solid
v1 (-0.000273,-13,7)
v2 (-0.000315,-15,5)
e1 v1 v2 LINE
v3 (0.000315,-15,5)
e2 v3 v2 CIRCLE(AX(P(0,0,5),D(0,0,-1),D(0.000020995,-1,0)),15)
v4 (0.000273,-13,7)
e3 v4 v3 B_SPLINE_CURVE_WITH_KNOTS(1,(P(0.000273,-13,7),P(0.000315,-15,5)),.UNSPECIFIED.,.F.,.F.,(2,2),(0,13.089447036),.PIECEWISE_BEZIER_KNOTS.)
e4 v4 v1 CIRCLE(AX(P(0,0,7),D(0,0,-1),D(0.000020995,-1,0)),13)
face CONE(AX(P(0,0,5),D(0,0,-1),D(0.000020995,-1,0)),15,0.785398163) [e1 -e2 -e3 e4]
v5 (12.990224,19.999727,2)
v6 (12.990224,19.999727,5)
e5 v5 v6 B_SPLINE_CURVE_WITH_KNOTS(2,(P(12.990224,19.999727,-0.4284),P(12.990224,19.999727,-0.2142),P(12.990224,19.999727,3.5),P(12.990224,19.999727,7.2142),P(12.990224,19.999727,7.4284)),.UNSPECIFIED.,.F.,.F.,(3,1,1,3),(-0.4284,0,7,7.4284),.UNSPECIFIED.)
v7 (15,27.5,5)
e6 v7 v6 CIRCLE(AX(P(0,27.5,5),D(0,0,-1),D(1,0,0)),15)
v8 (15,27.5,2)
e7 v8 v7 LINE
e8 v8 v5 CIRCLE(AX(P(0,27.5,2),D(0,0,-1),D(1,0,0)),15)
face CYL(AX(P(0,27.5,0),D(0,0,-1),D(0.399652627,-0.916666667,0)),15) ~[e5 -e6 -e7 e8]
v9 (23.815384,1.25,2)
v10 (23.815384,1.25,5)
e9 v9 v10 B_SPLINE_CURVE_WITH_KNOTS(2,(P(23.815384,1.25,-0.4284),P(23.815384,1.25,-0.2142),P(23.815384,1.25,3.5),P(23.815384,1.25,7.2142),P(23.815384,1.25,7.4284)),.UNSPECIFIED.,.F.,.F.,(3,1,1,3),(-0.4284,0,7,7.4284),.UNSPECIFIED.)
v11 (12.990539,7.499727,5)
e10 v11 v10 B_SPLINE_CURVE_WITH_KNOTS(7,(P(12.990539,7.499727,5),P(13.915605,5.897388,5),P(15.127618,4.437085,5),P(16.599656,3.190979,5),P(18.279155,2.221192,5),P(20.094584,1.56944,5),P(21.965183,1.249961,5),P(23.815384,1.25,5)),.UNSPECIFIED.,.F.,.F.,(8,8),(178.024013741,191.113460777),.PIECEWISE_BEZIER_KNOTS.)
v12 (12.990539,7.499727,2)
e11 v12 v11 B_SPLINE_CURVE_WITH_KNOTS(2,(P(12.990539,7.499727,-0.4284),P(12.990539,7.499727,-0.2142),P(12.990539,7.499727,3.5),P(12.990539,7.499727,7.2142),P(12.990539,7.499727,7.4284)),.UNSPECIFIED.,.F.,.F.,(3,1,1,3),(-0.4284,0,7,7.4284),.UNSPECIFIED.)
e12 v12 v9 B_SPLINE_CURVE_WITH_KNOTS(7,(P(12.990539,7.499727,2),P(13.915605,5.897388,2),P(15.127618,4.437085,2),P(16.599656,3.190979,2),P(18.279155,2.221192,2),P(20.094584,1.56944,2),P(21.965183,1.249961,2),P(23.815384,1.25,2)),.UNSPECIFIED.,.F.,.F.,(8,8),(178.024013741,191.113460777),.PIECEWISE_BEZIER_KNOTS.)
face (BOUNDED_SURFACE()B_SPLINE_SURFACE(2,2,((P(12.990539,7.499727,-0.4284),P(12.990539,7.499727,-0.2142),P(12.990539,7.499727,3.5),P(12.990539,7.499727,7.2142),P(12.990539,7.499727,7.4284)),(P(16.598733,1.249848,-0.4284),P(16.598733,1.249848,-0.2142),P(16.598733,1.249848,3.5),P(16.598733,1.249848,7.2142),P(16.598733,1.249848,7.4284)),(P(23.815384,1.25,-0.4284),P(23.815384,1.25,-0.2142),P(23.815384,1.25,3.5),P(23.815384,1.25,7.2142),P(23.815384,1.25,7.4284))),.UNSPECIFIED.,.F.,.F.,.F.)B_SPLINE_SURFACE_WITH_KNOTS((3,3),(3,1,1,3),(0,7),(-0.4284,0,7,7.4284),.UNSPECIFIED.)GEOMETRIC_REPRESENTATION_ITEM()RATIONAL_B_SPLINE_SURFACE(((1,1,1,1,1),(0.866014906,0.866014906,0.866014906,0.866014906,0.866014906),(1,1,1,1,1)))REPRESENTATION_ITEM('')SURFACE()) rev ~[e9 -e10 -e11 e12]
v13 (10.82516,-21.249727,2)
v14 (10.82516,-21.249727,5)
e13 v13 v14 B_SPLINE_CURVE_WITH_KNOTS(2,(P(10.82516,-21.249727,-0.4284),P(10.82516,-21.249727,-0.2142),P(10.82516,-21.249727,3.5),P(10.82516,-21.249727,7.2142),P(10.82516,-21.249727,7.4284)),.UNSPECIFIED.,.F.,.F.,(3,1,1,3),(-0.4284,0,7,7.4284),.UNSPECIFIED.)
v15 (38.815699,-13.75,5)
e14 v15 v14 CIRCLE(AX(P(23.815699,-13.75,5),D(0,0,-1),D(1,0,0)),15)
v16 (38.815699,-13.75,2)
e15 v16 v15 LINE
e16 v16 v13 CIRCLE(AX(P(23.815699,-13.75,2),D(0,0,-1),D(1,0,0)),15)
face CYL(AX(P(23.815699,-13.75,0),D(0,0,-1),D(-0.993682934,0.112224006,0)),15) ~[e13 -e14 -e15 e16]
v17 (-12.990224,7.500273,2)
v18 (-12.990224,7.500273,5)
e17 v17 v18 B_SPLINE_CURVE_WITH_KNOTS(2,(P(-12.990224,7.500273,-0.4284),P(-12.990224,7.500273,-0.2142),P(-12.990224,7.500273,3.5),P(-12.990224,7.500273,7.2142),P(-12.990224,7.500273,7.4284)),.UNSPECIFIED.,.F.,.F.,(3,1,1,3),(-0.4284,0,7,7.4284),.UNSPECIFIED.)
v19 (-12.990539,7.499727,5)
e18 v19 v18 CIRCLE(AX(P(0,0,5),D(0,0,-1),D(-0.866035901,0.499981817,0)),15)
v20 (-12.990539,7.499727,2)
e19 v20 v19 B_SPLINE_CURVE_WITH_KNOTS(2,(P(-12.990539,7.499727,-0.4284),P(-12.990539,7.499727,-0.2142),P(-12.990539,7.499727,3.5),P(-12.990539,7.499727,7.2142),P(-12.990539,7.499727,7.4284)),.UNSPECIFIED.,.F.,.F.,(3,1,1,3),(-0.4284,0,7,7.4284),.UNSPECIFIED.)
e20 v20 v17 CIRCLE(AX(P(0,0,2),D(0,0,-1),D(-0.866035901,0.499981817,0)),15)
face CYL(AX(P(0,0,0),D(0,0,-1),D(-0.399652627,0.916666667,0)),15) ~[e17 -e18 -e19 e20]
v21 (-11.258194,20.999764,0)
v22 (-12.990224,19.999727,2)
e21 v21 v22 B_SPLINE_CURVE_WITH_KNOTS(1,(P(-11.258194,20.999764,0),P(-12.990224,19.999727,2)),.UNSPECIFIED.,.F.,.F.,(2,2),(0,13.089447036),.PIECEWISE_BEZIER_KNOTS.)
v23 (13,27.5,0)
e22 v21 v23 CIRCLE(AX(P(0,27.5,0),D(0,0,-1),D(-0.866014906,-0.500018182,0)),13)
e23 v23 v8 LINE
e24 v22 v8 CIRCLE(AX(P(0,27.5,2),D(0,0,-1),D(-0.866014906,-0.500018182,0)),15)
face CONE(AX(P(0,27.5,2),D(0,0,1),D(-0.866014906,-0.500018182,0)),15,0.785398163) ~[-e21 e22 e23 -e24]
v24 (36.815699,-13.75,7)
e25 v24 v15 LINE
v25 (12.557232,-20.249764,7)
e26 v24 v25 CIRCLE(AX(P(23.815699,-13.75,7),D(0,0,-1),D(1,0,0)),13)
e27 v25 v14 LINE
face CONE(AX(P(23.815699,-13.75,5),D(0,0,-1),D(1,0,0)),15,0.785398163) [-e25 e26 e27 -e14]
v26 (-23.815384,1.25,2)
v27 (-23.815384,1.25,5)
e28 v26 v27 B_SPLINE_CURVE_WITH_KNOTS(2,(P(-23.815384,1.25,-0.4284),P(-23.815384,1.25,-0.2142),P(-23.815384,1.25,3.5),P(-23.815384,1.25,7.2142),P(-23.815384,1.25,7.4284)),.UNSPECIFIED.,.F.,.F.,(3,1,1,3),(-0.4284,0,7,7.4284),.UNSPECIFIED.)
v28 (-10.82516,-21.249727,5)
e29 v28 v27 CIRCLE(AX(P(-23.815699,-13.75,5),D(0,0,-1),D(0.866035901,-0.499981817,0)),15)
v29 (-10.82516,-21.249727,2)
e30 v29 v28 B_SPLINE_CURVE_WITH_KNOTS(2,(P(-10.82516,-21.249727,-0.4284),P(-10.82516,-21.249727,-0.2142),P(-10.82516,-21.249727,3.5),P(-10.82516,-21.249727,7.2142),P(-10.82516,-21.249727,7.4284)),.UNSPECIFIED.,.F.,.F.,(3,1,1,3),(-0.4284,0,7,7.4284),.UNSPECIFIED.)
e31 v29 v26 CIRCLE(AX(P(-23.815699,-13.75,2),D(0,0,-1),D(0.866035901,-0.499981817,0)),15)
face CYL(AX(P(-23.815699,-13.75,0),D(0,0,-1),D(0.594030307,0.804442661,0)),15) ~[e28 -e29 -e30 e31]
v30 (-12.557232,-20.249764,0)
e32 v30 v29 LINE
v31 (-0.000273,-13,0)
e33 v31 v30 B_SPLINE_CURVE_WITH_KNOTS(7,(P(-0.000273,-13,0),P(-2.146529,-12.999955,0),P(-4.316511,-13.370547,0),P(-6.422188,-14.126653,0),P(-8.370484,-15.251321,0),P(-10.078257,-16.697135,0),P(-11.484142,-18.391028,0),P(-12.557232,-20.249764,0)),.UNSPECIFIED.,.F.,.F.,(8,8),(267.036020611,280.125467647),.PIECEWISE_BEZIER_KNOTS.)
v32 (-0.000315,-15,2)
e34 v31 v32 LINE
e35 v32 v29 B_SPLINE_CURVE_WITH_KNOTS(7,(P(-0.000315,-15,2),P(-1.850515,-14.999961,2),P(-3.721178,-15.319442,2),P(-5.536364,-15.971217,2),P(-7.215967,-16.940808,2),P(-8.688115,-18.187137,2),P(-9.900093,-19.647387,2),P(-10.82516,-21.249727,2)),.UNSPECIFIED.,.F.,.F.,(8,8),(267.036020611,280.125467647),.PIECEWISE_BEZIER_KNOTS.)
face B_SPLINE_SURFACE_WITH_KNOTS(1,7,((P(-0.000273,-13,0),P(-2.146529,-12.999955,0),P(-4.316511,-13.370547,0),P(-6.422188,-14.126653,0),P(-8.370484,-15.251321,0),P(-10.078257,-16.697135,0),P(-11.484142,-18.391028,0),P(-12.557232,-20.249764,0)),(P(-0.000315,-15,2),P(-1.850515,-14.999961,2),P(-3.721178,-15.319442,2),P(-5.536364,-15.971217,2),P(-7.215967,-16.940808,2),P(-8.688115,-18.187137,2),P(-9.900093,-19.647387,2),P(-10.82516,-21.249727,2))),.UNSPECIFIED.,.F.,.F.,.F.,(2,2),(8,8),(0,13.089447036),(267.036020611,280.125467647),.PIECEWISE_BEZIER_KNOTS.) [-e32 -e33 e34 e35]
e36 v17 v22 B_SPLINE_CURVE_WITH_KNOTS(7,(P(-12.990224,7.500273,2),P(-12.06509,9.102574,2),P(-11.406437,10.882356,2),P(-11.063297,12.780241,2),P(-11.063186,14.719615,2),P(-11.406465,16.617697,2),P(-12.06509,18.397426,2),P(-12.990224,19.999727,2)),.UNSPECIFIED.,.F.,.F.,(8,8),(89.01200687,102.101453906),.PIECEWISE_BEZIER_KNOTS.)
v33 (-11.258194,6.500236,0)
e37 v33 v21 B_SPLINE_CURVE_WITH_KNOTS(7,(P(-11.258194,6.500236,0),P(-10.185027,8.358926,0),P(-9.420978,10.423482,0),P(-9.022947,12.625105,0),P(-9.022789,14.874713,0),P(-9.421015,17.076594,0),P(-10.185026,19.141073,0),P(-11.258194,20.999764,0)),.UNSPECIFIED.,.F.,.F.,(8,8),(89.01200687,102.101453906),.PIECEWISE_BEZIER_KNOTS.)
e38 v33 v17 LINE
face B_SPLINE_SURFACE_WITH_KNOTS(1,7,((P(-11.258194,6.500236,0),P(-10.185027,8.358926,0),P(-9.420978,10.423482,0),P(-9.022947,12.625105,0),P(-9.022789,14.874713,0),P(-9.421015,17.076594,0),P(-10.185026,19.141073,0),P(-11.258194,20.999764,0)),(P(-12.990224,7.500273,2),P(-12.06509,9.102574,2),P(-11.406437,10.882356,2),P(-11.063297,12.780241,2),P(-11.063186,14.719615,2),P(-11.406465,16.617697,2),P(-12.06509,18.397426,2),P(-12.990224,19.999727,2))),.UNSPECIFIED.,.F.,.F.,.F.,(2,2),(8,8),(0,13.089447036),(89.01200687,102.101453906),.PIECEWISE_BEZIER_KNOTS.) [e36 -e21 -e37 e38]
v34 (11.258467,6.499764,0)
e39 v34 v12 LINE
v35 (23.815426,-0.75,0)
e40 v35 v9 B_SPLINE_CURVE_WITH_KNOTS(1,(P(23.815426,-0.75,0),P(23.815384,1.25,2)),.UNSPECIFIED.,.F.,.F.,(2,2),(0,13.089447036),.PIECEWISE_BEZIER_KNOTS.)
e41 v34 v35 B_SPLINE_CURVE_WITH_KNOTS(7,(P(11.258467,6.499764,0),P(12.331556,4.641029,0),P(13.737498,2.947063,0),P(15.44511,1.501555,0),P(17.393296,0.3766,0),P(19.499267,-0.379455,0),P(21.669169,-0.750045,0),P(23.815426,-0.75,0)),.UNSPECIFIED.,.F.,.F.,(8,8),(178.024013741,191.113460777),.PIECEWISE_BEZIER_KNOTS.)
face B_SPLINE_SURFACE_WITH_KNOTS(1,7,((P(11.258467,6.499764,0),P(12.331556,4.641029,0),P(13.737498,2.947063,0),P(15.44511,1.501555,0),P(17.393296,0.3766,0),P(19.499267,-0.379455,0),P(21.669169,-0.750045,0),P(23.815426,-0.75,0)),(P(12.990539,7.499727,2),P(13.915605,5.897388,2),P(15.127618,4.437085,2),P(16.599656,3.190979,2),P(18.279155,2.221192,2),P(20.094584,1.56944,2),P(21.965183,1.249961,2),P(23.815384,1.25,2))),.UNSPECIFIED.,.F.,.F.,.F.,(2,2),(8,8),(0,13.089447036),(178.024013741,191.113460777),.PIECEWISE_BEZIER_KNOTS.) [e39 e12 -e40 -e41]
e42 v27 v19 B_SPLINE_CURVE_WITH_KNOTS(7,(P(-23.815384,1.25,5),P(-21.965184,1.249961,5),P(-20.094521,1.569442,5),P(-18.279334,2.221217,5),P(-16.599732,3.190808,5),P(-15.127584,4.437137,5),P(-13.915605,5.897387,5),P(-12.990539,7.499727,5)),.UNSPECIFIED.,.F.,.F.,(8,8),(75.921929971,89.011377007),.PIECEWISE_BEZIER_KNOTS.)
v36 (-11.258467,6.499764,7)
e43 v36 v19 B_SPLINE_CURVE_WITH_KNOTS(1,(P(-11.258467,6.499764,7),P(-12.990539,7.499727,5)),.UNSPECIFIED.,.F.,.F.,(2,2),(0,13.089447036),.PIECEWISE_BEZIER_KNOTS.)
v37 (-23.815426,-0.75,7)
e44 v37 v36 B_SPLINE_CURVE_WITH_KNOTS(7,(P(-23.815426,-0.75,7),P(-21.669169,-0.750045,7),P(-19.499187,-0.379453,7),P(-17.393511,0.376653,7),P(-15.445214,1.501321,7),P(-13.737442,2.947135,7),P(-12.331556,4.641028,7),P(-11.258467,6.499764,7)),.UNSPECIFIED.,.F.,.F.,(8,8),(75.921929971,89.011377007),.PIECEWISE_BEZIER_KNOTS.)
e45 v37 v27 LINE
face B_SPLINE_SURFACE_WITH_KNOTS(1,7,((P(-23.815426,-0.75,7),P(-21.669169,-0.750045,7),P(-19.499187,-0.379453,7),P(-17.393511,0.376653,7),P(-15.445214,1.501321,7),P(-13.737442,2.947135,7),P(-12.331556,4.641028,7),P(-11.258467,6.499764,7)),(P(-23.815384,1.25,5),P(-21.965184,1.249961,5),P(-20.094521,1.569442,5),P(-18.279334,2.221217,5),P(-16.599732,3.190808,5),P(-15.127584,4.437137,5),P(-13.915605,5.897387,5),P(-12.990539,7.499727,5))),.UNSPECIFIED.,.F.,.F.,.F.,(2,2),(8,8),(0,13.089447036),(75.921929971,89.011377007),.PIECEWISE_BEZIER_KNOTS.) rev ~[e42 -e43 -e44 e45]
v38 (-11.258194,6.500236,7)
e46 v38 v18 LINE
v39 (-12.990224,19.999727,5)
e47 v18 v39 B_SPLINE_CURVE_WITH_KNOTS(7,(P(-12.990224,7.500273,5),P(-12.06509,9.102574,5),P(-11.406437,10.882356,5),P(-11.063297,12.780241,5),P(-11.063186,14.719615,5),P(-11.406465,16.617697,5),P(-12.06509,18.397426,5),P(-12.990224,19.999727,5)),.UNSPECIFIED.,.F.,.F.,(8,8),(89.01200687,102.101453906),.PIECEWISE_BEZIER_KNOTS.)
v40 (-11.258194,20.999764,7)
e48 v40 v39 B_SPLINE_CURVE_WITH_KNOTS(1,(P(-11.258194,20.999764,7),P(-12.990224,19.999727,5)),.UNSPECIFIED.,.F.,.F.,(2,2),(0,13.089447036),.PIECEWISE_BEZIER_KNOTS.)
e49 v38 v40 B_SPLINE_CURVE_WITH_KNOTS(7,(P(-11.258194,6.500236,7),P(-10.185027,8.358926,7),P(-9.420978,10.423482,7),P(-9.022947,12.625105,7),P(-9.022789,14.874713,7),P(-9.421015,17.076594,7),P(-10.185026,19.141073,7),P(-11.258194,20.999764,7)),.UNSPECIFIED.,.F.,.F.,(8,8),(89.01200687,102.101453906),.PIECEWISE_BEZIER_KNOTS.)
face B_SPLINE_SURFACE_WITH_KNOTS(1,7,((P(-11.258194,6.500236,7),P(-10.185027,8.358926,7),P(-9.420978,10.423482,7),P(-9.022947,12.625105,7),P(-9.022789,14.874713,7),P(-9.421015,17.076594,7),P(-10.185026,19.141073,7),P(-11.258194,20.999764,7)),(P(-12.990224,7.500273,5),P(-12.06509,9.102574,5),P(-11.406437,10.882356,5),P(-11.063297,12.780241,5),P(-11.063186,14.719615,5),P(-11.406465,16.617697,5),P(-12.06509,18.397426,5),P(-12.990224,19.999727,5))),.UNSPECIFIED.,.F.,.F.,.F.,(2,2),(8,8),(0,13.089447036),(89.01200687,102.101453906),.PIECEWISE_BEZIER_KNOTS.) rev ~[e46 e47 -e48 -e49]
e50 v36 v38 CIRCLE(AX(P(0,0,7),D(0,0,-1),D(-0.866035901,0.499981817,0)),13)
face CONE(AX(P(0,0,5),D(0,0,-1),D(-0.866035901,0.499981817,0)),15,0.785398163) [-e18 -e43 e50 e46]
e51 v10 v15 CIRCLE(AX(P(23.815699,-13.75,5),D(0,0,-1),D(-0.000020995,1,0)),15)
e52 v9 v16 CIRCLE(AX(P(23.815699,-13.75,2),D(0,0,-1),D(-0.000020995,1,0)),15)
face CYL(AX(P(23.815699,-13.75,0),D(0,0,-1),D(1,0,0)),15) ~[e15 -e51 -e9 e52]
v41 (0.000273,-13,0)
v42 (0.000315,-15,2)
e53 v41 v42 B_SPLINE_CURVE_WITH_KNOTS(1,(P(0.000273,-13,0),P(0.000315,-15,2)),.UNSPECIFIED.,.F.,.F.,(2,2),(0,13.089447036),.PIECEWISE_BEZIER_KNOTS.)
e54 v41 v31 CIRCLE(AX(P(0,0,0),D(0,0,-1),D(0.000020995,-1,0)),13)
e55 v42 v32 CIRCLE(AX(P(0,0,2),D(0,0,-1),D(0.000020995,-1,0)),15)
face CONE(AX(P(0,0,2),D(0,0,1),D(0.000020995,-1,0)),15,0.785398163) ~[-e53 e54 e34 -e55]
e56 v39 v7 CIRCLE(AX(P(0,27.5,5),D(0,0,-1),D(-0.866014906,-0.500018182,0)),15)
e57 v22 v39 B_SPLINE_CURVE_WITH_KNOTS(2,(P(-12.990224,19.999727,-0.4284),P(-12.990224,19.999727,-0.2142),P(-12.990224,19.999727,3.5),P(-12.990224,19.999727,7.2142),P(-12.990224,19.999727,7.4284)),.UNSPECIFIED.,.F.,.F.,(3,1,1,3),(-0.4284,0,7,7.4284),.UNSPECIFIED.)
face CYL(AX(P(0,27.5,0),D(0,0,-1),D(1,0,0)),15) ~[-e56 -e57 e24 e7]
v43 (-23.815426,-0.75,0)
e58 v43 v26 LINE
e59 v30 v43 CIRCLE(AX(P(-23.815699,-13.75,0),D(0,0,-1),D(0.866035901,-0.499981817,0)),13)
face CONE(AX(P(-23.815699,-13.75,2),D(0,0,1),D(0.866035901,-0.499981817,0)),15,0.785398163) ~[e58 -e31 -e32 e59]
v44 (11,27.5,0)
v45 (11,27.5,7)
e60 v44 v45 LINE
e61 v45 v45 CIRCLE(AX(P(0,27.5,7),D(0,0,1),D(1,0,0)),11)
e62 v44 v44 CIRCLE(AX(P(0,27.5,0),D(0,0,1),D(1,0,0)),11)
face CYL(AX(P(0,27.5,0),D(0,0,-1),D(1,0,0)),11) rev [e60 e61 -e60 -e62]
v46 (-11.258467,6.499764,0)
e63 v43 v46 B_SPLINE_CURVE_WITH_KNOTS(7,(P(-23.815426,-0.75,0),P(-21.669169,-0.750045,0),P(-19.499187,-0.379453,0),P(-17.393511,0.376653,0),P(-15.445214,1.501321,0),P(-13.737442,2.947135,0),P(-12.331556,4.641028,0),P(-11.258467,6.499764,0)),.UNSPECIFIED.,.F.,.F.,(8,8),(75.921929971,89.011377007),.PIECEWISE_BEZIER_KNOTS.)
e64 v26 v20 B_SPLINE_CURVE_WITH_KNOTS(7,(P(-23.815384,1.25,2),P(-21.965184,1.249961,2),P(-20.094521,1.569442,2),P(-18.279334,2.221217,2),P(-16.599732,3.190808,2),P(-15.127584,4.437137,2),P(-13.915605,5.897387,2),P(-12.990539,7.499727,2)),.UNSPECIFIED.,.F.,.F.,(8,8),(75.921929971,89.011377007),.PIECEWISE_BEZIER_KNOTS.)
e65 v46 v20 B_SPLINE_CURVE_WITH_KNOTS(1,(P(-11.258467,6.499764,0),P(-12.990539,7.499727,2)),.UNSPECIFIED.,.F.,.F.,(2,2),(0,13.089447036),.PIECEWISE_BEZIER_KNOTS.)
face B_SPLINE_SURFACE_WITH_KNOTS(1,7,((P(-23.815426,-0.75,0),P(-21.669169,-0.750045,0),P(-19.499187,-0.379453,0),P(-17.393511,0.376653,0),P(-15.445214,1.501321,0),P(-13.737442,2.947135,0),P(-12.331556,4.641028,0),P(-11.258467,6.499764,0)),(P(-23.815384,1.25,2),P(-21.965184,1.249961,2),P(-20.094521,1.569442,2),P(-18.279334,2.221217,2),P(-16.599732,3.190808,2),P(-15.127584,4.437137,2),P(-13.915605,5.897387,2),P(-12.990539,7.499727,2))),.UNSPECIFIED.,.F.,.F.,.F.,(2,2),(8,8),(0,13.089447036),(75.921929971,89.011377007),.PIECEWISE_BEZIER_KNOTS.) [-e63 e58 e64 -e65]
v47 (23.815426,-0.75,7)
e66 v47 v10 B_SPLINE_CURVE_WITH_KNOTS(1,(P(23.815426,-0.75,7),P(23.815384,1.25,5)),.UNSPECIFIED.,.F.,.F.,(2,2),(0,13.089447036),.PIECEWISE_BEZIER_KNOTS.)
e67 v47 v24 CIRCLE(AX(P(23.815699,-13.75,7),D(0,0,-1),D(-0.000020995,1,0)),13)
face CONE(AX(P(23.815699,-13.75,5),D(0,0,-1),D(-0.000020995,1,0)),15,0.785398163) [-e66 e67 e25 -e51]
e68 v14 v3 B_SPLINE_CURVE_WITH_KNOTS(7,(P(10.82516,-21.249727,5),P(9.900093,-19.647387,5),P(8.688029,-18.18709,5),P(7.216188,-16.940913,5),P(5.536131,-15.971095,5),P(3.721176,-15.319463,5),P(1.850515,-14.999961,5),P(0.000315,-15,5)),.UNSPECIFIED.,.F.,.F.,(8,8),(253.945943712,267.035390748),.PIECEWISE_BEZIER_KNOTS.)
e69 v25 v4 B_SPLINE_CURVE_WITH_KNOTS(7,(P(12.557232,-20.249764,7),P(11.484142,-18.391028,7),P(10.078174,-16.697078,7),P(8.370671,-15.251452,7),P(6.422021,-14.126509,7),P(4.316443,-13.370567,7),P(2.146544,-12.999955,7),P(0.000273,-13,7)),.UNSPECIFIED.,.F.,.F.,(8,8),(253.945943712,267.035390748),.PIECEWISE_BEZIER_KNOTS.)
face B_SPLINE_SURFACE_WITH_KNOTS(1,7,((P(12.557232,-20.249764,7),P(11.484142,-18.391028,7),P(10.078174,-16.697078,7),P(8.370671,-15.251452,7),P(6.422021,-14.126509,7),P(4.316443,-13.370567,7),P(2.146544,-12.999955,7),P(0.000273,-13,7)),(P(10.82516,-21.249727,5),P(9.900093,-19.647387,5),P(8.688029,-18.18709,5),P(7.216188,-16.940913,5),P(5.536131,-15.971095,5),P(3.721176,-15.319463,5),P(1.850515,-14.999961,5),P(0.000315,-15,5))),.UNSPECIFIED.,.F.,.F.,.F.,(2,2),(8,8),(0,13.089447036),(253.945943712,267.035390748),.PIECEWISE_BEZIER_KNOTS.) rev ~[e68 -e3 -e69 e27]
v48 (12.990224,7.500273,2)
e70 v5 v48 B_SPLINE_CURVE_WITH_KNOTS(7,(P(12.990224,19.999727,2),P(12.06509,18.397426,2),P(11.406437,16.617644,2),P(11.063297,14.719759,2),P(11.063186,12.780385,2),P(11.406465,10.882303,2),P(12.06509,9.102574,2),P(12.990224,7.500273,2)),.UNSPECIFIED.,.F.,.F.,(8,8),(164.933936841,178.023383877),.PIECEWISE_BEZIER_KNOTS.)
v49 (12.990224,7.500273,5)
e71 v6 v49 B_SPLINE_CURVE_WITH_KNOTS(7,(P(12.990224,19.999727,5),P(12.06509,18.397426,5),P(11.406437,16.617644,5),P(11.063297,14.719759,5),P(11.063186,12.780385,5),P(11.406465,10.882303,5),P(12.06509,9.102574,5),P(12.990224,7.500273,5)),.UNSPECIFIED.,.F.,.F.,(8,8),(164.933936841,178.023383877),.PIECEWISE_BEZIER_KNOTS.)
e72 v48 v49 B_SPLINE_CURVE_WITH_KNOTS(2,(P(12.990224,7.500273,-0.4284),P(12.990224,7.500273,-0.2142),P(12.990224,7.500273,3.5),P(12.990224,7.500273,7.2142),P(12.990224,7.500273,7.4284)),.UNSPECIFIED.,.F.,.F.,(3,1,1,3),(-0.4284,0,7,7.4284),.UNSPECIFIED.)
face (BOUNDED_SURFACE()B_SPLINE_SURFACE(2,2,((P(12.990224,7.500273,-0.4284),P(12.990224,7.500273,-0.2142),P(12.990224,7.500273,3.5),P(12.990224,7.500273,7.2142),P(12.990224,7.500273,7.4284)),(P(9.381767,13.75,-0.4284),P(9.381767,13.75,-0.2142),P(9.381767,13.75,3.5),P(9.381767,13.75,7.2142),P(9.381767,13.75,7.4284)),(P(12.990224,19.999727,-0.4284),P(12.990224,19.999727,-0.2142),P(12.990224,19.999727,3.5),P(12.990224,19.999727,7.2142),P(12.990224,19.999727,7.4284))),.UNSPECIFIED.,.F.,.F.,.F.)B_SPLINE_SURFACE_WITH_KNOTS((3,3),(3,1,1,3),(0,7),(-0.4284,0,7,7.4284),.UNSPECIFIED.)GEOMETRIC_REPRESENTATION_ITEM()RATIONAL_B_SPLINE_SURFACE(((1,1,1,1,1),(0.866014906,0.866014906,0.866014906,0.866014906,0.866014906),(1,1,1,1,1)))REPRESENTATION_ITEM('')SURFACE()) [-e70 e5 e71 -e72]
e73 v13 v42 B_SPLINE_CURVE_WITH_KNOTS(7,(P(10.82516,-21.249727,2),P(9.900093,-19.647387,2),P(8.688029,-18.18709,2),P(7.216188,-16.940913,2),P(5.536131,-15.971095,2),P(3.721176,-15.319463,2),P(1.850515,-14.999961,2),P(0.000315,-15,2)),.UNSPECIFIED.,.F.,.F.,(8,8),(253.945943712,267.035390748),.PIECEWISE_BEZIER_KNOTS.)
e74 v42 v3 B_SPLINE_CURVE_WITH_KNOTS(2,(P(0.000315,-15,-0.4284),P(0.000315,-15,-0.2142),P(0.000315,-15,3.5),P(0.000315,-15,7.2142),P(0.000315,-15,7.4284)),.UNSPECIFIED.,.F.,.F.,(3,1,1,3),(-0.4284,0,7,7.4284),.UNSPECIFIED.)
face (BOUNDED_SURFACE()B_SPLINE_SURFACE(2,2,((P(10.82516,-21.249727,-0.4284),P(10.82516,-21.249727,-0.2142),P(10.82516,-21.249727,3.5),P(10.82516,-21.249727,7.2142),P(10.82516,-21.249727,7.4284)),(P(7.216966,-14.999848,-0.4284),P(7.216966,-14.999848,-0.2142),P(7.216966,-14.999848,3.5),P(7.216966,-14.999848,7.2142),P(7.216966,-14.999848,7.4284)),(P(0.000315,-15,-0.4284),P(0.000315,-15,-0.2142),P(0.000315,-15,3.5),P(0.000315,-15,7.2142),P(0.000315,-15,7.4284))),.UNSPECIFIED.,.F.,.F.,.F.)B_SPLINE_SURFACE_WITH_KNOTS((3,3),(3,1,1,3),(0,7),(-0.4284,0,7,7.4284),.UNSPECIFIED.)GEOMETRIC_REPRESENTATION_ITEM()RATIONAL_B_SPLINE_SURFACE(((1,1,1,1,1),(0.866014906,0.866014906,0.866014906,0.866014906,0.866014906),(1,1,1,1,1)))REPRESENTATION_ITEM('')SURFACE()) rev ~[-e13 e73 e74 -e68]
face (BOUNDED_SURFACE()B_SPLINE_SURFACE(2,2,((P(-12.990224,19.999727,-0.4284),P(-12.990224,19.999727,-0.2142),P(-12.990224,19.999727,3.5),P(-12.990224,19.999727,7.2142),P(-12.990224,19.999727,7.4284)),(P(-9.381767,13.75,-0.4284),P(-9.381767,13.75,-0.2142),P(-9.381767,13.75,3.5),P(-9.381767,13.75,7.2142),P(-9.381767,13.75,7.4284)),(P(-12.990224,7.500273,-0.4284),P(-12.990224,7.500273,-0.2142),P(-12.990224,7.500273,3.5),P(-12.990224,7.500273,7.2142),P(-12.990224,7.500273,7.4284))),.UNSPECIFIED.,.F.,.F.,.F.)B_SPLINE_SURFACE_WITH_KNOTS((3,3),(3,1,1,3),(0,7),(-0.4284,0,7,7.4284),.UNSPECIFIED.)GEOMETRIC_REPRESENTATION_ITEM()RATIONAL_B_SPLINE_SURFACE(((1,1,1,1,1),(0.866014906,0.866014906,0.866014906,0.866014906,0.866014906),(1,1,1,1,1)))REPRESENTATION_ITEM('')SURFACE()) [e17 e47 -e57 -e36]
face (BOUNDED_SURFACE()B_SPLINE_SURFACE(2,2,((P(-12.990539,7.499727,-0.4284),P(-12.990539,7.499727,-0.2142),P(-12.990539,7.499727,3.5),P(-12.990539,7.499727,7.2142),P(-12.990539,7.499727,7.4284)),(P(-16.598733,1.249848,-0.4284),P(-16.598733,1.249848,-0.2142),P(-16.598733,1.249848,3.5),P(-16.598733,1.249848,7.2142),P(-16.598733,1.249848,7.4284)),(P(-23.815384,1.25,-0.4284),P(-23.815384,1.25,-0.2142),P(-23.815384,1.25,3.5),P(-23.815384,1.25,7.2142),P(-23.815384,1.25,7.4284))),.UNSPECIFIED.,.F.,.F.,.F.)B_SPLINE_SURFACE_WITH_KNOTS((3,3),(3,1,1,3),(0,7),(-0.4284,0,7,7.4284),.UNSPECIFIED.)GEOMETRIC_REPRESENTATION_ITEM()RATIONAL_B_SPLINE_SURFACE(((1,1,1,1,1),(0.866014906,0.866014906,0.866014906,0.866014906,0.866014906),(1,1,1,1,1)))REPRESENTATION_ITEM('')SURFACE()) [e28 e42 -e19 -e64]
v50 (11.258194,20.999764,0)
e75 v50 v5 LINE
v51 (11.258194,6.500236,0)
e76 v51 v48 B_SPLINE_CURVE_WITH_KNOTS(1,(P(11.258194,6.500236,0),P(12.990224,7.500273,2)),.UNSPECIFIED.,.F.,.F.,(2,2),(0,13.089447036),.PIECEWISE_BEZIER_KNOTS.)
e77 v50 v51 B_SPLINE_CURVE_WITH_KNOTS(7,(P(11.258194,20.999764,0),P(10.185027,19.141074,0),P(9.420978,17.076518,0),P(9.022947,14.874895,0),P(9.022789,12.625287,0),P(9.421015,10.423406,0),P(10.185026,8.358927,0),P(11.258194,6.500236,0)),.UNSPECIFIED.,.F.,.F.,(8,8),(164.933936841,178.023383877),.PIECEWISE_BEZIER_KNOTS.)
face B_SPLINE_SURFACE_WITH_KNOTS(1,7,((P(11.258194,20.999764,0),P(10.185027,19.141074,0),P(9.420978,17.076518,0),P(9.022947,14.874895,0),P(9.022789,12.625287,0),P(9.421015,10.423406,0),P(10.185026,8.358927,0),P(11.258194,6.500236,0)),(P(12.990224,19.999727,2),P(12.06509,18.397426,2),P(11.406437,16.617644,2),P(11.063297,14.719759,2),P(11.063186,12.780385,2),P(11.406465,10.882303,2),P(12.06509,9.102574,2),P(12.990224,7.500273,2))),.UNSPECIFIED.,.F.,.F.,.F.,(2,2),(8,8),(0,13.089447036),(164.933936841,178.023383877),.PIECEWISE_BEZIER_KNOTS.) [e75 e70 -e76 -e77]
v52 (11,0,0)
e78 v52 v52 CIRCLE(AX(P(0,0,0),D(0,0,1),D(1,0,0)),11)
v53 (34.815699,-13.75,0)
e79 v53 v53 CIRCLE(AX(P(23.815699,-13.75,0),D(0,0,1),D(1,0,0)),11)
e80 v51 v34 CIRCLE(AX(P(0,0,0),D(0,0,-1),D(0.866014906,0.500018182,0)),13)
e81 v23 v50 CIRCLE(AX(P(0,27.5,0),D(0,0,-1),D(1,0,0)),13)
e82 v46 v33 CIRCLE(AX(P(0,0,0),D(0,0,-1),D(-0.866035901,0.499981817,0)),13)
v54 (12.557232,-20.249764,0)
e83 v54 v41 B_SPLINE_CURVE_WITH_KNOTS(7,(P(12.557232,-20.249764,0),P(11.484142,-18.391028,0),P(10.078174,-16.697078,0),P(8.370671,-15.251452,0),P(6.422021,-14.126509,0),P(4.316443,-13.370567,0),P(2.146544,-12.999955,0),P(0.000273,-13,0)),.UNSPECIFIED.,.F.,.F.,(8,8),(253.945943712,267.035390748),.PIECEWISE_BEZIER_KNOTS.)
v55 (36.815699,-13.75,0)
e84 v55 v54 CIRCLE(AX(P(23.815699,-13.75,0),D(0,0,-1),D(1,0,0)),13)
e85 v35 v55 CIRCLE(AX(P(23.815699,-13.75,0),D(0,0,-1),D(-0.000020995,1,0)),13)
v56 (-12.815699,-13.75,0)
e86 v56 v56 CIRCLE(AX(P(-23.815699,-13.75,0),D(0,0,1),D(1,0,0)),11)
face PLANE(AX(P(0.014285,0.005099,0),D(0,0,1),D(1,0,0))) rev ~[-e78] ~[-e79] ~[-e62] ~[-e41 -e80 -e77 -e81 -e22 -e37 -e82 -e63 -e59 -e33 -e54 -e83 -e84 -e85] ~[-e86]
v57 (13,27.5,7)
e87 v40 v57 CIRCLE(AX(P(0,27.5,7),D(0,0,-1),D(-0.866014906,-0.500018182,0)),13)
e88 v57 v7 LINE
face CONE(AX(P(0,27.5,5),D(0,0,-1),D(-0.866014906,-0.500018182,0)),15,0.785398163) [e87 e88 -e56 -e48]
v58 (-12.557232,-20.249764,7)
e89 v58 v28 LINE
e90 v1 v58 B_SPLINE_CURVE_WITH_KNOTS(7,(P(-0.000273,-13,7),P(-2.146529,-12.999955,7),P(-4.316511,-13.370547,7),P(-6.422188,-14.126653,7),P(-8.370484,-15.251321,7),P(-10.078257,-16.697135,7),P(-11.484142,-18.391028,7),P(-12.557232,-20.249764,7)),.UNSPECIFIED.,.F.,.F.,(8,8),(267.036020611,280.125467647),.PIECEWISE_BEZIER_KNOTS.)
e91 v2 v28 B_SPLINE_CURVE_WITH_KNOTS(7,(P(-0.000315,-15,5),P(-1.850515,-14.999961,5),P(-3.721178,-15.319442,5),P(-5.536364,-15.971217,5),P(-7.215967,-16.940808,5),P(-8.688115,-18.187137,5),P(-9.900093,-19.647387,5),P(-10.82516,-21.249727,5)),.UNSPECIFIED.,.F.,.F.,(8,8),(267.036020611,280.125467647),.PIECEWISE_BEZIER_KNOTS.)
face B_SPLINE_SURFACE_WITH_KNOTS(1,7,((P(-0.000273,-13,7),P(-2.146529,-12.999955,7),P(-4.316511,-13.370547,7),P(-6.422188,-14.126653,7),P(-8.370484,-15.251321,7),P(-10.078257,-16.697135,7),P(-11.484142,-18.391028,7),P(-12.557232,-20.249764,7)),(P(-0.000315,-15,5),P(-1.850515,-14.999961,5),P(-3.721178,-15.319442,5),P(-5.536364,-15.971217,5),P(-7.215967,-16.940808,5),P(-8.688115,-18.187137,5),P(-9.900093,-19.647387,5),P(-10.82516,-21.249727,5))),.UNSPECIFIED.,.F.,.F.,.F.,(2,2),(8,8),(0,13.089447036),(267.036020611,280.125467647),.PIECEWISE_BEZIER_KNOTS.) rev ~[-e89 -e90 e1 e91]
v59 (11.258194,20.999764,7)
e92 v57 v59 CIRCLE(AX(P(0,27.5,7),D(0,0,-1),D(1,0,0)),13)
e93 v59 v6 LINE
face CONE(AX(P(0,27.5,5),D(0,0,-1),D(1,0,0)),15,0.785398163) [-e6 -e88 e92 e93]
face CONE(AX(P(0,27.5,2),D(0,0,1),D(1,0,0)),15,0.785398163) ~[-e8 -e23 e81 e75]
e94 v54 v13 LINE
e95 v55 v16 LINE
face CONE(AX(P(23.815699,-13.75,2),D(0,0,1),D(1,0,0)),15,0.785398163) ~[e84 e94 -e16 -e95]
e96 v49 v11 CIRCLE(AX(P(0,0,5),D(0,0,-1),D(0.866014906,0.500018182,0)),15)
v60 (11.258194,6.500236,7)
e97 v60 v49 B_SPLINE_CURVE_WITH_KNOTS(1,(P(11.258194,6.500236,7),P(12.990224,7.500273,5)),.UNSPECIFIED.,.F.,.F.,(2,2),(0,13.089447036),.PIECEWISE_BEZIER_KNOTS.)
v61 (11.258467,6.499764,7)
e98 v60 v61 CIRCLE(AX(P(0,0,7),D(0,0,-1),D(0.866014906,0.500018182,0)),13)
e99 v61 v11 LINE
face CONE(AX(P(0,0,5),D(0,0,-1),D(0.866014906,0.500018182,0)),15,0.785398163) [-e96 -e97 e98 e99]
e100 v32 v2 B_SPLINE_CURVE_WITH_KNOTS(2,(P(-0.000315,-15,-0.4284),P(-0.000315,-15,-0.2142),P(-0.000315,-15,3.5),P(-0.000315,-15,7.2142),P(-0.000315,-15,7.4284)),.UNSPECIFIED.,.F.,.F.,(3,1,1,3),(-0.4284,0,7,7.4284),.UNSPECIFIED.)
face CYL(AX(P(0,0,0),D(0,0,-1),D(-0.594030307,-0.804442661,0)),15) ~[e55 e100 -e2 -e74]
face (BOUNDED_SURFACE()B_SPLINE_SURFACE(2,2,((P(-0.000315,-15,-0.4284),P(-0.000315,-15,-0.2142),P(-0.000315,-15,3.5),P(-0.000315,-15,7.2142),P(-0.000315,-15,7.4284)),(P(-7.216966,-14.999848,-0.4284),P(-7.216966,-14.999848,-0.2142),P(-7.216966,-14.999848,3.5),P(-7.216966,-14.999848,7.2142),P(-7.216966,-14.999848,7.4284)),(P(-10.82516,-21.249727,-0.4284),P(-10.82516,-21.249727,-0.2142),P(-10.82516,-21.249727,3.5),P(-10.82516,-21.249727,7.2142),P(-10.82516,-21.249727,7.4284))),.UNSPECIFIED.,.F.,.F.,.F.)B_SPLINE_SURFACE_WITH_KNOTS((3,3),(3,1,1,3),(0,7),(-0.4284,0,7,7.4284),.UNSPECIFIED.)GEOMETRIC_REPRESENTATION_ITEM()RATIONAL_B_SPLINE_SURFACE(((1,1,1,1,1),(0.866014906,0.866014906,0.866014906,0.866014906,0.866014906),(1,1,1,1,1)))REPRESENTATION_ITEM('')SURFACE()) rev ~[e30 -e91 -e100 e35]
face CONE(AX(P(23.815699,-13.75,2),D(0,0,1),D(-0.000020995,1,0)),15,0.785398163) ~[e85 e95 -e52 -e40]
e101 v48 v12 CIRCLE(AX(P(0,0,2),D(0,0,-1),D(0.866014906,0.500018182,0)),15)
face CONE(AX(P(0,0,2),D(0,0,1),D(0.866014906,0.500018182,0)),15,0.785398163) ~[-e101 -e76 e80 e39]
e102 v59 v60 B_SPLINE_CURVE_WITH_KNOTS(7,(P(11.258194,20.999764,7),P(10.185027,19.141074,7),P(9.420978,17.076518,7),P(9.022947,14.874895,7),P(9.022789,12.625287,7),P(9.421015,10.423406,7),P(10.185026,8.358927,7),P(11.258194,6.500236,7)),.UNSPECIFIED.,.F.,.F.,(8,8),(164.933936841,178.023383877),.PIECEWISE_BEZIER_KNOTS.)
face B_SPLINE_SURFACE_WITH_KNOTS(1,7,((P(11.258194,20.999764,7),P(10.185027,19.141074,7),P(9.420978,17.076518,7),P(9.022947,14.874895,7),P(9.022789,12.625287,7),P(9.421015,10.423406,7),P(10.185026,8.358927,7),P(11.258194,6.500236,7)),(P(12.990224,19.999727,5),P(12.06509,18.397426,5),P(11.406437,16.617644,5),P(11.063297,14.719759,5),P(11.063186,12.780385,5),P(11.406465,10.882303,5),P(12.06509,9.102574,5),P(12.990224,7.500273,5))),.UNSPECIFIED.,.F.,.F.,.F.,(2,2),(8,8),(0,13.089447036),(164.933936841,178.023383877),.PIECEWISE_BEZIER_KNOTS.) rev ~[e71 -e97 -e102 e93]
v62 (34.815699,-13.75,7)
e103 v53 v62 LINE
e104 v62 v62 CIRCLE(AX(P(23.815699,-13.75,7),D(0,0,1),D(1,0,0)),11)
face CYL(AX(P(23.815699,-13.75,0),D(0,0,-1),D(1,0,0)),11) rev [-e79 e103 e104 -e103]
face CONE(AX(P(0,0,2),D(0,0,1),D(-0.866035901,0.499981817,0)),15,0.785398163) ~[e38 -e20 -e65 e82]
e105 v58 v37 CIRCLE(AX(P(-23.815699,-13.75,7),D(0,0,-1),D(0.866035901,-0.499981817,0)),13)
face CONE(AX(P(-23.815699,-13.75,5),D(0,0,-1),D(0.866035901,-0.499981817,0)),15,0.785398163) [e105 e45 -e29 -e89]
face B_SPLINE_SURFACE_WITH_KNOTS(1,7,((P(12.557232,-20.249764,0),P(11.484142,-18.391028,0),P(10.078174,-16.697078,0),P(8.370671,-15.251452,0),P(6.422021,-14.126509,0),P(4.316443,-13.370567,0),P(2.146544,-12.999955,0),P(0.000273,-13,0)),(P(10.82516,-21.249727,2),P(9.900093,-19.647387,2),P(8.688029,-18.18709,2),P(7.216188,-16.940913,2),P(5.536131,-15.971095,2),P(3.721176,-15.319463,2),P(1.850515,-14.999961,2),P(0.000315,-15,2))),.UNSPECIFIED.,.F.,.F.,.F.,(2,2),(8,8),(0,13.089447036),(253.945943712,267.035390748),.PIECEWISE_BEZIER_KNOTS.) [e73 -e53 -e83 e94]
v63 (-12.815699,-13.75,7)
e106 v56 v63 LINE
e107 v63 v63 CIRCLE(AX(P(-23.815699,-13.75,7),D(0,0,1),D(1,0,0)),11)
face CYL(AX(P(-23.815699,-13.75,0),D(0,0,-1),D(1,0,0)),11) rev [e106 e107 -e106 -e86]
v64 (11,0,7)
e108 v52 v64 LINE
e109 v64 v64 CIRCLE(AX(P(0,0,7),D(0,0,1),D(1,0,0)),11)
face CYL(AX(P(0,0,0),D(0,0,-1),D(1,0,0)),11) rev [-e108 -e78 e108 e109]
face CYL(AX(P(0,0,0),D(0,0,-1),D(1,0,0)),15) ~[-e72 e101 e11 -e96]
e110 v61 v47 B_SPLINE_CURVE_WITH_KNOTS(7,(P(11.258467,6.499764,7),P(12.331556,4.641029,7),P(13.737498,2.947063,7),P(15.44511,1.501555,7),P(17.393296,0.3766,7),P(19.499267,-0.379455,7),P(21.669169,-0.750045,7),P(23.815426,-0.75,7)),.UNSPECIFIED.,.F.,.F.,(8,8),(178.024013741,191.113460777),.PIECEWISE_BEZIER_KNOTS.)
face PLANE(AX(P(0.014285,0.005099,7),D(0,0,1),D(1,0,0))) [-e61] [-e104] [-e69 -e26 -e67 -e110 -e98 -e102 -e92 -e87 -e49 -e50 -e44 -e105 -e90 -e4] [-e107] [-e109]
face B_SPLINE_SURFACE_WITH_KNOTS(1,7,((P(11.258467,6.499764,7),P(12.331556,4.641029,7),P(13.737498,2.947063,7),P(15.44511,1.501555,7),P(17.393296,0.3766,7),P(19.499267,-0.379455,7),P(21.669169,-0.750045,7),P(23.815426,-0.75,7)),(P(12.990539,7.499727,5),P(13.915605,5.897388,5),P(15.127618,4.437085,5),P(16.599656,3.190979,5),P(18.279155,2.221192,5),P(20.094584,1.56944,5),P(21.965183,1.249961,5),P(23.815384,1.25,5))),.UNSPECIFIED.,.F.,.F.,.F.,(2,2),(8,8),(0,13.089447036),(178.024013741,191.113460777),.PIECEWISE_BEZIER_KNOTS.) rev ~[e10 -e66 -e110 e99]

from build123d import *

# Parameters (mm, degrees)
F0_R     = 11
F1_DEPTH = 7
F2_R     = 12.499
F3_SIZE  = 2


# Not quite as in the source:
# - a fillet or chamfer is up to 0.001 mm smaller than in the source, because OpenCascade refuses the exact size


with BuildPart() as f1:
    # F0 (on Top) → F1 (new body)
    with BuildSketch(Plane.XY):
        with BuildLine():
            ThreePointArc((14.9052440041, -1.6833600857), (14.9762922658, -0.8430124372), (15, 0))
            ThreePointArc((15, 0), (12.5483433381, 8.2182163192), (5.9947894041, 13.75))
            ThreePointArc((5.9947894041, 13.75), (0, 12.5), (-5.9947894041, 13.75))
            ThreePointArc((-5.9947894041, 13.75), (-12.9903810568, 7.5), (-14.9052440041, -1.6833600857))
            ThreePointArc((-14.9052440041, -1.6833600857), (-10.8253175473, -6.25), (-8.9104546, -12.0666399143))
            ThreePointArc((-8.9104546, -12.0666399143), (0, -15), (8.9104546, -12.0666399143))
            ThreePointArc((8.9104546, -12.0666399143), (10.8253175473, -6.25), (14.9052440041, -1.6833600857))
        make_face()
        Circle(F0_R, mode=Mode.SUBTRACT)
        with BuildLine():
            ThreePointArc((-5.9947894041, 13.75), (0, 12.5), (5.9947894041, 13.75))
            ThreePointArc((5.9947894041, 13.75), (0, 15), (-5.9947894041, 13.75))
        make_face()
        with BuildLine():
            ThreePointArc((-5.9947894041, 13.75), (0, 15), (5.9947894041, 13.75))
            ThreePointArc((5.9947894041, 13.75), (12.5483433381, 19.2817836808), (15, 27.5))
            ThreePointArc((15, 27.5), (-8.2182163192, 40.0483433381), (-5.9947894041, 13.75))
        make_face()
        with Locations((0, 27.5)):
            Circle(F0_R, mode=Mode.SUBTRACT)
        with BuildLine():
            ThreePointArc((38.8156986041, -13.75), (30.5737745507, -0.3586442247), (14.9052440041, -1.6833600857))
            ThreePointArc((14.9052440041, -1.6833600857), (12.9903810568, -7.5), (8.9104546, -12.0666399143))
            ThreePointArc((8.9104546, -12.0666399143), (22.9726861669, -28.7262922658), (38.8156986041, -13.75))
        make_face()
        with Locations((23.8156986041, -13.75)):
            Circle(F0_R, mode=Mode.SUBTRACT)
        with BuildLine():
            ThreePointArc((8.9104546, -12.0666399143), (12.9903810568, -7.5), (14.9052440041, -1.6833600857))
            ThreePointArc((14.9052440041, -1.6833600857), (10.8253175473, -6.25), (8.9104546, -12.0666399143))
        make_face()
        with BuildLine():
            ThreePointArc((-8.9104546, -12.0666399143), (-10.8253175473, -6.25), (-14.9052440041, -1.6833600857))
            ThreePointArc((-14.9052440041, -1.6833600857), (-12.9903810568, -7.5), (-8.9104546, -12.0666399143))
        make_face()
        with BuildLine():
            ThreePointArc((-8.9104546, -12.0666399143), (-12.9903810568, -7.5), (-14.9052440041, -1.6833600857))
            ThreePointArc((-14.9052440041, -1.6833600857), (-37.2070543793, -20.5080759466), (-8.8156986041, -13.75))
            ThreePointArc((-8.8156986041, -13.75), (-8.8394063383, -12.9069875628), (-8.9104546, -12.0666399143))
        make_face()
        with Locations((-23.8156986041, -13.75)):
            Circle(F0_R, mode=Mode.SUBTRACT)
    extrude(amount=F1_DEPTH)

    # F2 (radius 12.5 in the source; OpenCascade refuses exactly that, so slightly less here)
    f2_edges = [f1.edges().sort_by_distance(p)[0] for p in [
        (-5.994789, 13.75, 3.5),
        (14.905244, -1.68336, 3.5),
        (-14.905244, -1.68336, 3.5),
        (5.994789, 13.75, 3.5),
        (-8.910455, -12.06664, 3.5),
        (8.910455, -12.06664, 3.5),
    ]]
    fillet(f2_edges, radius=F2_R)

    # F3
    f3_edges = [f1.edges().sort_by_distance(p)[0] for p in [
        (-6.250077, -16.674548, 0),
        (-6.250077, -16.674548, 7),
    ]]
    chamfer(f3_edges, length=F3_SIZE)


solid = f1.part
